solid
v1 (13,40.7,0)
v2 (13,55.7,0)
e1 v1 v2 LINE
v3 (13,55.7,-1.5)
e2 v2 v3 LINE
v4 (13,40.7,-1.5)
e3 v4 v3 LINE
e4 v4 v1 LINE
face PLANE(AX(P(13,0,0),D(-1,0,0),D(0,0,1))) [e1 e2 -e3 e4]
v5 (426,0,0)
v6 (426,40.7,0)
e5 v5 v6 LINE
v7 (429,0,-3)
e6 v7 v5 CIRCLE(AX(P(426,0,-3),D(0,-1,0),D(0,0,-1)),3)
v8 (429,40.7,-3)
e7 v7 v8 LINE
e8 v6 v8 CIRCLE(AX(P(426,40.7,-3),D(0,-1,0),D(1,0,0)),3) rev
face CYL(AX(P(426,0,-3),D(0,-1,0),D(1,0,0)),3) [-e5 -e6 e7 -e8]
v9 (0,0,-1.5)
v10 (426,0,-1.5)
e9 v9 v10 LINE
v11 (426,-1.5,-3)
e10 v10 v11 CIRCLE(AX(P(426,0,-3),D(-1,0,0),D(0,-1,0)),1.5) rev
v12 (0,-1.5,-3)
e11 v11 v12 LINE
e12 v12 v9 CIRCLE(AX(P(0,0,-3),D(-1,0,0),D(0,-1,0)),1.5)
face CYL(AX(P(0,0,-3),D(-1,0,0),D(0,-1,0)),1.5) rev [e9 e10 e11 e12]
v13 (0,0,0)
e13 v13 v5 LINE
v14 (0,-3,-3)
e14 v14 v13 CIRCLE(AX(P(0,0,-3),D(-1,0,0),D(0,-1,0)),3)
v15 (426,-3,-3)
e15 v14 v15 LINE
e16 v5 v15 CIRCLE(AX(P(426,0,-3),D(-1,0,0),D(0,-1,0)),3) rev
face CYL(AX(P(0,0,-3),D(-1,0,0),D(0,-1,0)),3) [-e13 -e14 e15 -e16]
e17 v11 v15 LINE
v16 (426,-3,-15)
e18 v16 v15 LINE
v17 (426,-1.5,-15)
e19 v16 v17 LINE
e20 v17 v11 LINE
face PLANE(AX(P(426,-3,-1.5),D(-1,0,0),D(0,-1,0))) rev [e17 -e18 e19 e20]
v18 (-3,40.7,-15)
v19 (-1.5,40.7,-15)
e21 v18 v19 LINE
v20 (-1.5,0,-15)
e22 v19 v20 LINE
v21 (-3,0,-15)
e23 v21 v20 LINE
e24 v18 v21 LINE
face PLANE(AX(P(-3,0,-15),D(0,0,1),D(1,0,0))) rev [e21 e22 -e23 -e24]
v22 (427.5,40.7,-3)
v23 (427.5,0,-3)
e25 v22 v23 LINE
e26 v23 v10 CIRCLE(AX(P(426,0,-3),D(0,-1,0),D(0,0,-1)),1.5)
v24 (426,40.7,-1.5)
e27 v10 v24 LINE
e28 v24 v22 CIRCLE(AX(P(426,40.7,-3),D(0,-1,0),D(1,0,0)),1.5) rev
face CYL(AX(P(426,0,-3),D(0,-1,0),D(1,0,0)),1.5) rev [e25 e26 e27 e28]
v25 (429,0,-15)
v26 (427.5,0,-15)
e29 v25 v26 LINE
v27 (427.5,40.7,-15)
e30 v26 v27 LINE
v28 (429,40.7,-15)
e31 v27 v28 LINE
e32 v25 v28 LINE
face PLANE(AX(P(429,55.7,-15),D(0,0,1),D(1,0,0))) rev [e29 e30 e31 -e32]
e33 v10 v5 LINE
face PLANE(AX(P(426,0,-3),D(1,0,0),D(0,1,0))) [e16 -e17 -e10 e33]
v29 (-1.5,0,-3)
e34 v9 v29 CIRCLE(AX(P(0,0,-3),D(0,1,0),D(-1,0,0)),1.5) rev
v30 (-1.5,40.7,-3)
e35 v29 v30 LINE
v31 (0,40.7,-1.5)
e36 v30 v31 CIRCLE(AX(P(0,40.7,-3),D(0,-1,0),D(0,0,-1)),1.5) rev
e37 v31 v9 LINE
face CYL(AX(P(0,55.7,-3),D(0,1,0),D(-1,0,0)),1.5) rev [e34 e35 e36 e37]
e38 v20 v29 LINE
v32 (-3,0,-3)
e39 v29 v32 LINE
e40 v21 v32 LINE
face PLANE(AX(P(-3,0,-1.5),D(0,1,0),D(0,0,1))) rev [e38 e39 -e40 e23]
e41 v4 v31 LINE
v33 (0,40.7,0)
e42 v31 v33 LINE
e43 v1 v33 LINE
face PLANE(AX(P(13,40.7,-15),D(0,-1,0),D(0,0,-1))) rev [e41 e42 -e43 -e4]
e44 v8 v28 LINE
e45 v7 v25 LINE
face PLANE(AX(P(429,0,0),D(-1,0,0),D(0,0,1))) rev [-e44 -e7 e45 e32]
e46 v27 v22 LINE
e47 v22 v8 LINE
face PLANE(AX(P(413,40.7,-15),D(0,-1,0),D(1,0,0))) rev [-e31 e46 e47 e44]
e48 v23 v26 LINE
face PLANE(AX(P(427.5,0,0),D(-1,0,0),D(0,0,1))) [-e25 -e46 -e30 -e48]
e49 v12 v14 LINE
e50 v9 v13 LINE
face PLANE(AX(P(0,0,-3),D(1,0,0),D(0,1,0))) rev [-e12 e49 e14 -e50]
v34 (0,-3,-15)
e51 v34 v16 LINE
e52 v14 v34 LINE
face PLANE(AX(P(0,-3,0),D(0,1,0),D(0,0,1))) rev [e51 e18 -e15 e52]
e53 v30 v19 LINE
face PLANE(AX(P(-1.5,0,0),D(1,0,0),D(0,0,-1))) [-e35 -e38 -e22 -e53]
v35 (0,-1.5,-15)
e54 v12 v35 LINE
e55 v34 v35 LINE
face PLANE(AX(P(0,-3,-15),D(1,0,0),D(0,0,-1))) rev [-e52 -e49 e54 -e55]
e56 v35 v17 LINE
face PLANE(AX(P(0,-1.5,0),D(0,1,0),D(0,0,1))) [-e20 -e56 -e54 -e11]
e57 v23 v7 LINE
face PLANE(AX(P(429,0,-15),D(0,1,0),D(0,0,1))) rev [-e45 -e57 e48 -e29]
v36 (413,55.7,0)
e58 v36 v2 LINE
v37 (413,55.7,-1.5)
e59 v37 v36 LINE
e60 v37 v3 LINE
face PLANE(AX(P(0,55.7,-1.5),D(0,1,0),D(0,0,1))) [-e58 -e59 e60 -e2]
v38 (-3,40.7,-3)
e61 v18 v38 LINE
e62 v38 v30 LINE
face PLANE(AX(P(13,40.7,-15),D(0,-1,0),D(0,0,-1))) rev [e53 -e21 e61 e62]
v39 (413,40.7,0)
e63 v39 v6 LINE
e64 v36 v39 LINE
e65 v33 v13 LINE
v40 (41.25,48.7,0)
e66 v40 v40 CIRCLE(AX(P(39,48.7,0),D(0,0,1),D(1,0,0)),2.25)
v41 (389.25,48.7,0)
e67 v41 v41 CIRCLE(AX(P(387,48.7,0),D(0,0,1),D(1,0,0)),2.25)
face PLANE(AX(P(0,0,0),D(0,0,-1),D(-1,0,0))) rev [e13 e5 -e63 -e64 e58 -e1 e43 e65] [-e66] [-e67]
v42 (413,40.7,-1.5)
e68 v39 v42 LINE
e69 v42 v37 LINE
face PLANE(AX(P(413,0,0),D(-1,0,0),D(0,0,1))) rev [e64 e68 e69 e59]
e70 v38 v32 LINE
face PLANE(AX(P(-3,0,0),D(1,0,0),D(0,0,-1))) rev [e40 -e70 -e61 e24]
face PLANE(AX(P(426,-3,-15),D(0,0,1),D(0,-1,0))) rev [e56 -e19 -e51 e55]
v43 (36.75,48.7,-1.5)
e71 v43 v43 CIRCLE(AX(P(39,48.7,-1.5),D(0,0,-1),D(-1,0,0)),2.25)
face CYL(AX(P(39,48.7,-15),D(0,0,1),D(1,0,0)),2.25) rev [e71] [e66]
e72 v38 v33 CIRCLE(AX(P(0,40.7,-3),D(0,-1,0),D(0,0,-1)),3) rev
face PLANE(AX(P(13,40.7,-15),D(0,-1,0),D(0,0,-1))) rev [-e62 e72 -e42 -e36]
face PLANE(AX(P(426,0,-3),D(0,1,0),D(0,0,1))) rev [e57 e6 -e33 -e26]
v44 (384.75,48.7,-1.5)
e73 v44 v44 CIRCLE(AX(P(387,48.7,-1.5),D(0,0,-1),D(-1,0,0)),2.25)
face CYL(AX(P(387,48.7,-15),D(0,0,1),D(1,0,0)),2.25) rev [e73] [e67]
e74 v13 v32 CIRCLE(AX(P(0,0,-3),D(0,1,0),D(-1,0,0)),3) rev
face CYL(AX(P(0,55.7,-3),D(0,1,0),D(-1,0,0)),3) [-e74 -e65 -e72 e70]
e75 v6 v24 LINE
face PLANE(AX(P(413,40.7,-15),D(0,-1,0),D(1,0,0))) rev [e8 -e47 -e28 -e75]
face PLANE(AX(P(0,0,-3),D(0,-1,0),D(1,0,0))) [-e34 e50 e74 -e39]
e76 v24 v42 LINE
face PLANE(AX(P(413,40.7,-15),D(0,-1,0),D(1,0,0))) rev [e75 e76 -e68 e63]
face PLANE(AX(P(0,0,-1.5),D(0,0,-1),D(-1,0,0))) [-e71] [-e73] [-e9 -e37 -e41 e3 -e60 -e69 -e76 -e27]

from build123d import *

# Parameters (mm, degrees)
SKETCH_1_W             = 426
SKETCH_1_H             = 55.7
SM_BASE_FLANGE_1_DEPTH = 1.5
SM_EDGE_FLANGE_2_DEPTH = 55.7
SM_EDGE_FLANGE_3_DEPTH = 426
SM_EDGE_FLANGE_4_DEPTH = 55.7
SKETCH_25_W            = 15
SKETCH_25_H            = 15
CUT_EXTRUDE_1_DEPTH    = 16
SKETCH_26_W            = 15
SKETCH_26_H            = 15
CUT_EXTRUDE_2_DEPTH    = 16
SKETCH_27_R            = 2.25
CUT_EXTRUDE_3_DEPTH    = 433.860820588


# Sheet-metal steps are written as plain solids
with BuildPart() as part:
    # Sketch 1 → Базовая кромка1 (new body)
    with BuildSketch(Plane.XY):
        with Locations((213, 27.85)):
            Rectangle(SKETCH_1_W, SKETCH_1_H)
    extrude(amount=-SM_BASE_FLANGE_1_DEPTH)

    # Ребро-кромка2 section (across the edge) → Ребро-кромка2 (add)
    with BuildSketch(Plane(origin=(-1.5, 0, -1.5), x_dir=(1, 0, 0), z_dir=(0, 1, 0))):
        with BuildLine():
            Line((-1.5, 1.5), (-1.5, 13.5))
            Line((-1.5, 13.5), (0, 13.5))
            Line((0, 13.5), (0, 1.5))
            ThreePointArc((0, 1.5), (0.439339828, 0.439339828), (1.5, 0))
            Line((1.5, 0), (1.5, -1.5))
            ThreePointArc((1.5, -1.5), (-0.621320344, -0.621320344), (-1.5, 1.5))
        make_face()
    extrude(amount=SM_EDGE_FLANGE_2_DEPTH)

    # Ребро-кромка3 section (across the edge) → Ребро-кромка3 (add)
    with BuildSketch(Plane(origin=(426, -1.5, -1.5), x_dir=(0, 1, 0), z_dir=(-1, 0, 0))):
        with BuildLine():
            Line((-1.5, 1.5), (-1.5, 13.5))
            Line((-1.5, 13.5), (0, 13.5))
            Line((0, 13.5), (0, 1.5))
            ThreePointArc((0, 1.5), (0.439339828, 0.439339828), (1.5, 0))
            Line((1.5, 0), (1.5, -1.5))
            ThreePointArc((1.5, -1.5), (-0.621320344, -0.621320344), (-1.5, 1.5))
        make_face()
    extrude(amount=SM_EDGE_FLANGE_3_DEPTH)

    # Ребро-кромка4 section (across the edge) → Ребро-кромка4 (add)
    with BuildSketch(Plane(origin=(427.5, 55.7, -1.5), x_dir=(-1, 0, 0), z_dir=(0, -1, 0))):
        with BuildLine():
            Line((-1.5, 1.5), (-1.5, 13.5))
            Line((-1.5, 13.5), (0, 13.5))
            Line((0, 13.5), (0, 1.5))
            ThreePointArc((0, 1.5), (0.439339828, 0.439339828), (1.5, 0))
            Line((1.5, 0), (1.5, -1.5))
            ThreePointArc((1.5, -1.5), (-0.621320344, -0.621320344), (-1.5, 1.5))
        make_face()
    extrude(amount=SM_EDGE_FLANGE_4_DEPTH)

    # Эскиз25 → Вырез-Вытянуть1 (cut)
    with BuildSketch(Plane.ZY.offset(3)):
        with Locations((-7.5, 48.2)):
            Rectangle(SKETCH_25_W, SKETCH_25_H)
    extrude(amount=-CUT_EXTRUDE_1_DEPTH, mode=Mode.SUBTRACT)

    # Эскиз26 → Вырез-Вытянуть2 (cut)
    with BuildSketch(Plane(origin=(429, 0, 0), x_dir=(0, 0, -1), z_dir=(1, 0, 0))):
        with Locations((7.5, 48.2)):
            Rectangle(SKETCH_26_W, SKETCH_26_H)
    extrude(amount=-CUT_EXTRUDE_2_DEPTH, mode=Mode.SUBTRACT)

    # Эскиз27 → Вырез-Вытянуть3 (cut, through all)
    with BuildSketch(Plane.XY):
        with Locations((39, 48.7)):
            Circle(SKETCH_27_R)
        with Locations((387, 48.7)):
            Circle(SKETCH_27_R)
    extrude(amount=-CUT_EXTRUDE_3_DEPTH, mode=Mode.SUBTRACT)


solid = part.part
